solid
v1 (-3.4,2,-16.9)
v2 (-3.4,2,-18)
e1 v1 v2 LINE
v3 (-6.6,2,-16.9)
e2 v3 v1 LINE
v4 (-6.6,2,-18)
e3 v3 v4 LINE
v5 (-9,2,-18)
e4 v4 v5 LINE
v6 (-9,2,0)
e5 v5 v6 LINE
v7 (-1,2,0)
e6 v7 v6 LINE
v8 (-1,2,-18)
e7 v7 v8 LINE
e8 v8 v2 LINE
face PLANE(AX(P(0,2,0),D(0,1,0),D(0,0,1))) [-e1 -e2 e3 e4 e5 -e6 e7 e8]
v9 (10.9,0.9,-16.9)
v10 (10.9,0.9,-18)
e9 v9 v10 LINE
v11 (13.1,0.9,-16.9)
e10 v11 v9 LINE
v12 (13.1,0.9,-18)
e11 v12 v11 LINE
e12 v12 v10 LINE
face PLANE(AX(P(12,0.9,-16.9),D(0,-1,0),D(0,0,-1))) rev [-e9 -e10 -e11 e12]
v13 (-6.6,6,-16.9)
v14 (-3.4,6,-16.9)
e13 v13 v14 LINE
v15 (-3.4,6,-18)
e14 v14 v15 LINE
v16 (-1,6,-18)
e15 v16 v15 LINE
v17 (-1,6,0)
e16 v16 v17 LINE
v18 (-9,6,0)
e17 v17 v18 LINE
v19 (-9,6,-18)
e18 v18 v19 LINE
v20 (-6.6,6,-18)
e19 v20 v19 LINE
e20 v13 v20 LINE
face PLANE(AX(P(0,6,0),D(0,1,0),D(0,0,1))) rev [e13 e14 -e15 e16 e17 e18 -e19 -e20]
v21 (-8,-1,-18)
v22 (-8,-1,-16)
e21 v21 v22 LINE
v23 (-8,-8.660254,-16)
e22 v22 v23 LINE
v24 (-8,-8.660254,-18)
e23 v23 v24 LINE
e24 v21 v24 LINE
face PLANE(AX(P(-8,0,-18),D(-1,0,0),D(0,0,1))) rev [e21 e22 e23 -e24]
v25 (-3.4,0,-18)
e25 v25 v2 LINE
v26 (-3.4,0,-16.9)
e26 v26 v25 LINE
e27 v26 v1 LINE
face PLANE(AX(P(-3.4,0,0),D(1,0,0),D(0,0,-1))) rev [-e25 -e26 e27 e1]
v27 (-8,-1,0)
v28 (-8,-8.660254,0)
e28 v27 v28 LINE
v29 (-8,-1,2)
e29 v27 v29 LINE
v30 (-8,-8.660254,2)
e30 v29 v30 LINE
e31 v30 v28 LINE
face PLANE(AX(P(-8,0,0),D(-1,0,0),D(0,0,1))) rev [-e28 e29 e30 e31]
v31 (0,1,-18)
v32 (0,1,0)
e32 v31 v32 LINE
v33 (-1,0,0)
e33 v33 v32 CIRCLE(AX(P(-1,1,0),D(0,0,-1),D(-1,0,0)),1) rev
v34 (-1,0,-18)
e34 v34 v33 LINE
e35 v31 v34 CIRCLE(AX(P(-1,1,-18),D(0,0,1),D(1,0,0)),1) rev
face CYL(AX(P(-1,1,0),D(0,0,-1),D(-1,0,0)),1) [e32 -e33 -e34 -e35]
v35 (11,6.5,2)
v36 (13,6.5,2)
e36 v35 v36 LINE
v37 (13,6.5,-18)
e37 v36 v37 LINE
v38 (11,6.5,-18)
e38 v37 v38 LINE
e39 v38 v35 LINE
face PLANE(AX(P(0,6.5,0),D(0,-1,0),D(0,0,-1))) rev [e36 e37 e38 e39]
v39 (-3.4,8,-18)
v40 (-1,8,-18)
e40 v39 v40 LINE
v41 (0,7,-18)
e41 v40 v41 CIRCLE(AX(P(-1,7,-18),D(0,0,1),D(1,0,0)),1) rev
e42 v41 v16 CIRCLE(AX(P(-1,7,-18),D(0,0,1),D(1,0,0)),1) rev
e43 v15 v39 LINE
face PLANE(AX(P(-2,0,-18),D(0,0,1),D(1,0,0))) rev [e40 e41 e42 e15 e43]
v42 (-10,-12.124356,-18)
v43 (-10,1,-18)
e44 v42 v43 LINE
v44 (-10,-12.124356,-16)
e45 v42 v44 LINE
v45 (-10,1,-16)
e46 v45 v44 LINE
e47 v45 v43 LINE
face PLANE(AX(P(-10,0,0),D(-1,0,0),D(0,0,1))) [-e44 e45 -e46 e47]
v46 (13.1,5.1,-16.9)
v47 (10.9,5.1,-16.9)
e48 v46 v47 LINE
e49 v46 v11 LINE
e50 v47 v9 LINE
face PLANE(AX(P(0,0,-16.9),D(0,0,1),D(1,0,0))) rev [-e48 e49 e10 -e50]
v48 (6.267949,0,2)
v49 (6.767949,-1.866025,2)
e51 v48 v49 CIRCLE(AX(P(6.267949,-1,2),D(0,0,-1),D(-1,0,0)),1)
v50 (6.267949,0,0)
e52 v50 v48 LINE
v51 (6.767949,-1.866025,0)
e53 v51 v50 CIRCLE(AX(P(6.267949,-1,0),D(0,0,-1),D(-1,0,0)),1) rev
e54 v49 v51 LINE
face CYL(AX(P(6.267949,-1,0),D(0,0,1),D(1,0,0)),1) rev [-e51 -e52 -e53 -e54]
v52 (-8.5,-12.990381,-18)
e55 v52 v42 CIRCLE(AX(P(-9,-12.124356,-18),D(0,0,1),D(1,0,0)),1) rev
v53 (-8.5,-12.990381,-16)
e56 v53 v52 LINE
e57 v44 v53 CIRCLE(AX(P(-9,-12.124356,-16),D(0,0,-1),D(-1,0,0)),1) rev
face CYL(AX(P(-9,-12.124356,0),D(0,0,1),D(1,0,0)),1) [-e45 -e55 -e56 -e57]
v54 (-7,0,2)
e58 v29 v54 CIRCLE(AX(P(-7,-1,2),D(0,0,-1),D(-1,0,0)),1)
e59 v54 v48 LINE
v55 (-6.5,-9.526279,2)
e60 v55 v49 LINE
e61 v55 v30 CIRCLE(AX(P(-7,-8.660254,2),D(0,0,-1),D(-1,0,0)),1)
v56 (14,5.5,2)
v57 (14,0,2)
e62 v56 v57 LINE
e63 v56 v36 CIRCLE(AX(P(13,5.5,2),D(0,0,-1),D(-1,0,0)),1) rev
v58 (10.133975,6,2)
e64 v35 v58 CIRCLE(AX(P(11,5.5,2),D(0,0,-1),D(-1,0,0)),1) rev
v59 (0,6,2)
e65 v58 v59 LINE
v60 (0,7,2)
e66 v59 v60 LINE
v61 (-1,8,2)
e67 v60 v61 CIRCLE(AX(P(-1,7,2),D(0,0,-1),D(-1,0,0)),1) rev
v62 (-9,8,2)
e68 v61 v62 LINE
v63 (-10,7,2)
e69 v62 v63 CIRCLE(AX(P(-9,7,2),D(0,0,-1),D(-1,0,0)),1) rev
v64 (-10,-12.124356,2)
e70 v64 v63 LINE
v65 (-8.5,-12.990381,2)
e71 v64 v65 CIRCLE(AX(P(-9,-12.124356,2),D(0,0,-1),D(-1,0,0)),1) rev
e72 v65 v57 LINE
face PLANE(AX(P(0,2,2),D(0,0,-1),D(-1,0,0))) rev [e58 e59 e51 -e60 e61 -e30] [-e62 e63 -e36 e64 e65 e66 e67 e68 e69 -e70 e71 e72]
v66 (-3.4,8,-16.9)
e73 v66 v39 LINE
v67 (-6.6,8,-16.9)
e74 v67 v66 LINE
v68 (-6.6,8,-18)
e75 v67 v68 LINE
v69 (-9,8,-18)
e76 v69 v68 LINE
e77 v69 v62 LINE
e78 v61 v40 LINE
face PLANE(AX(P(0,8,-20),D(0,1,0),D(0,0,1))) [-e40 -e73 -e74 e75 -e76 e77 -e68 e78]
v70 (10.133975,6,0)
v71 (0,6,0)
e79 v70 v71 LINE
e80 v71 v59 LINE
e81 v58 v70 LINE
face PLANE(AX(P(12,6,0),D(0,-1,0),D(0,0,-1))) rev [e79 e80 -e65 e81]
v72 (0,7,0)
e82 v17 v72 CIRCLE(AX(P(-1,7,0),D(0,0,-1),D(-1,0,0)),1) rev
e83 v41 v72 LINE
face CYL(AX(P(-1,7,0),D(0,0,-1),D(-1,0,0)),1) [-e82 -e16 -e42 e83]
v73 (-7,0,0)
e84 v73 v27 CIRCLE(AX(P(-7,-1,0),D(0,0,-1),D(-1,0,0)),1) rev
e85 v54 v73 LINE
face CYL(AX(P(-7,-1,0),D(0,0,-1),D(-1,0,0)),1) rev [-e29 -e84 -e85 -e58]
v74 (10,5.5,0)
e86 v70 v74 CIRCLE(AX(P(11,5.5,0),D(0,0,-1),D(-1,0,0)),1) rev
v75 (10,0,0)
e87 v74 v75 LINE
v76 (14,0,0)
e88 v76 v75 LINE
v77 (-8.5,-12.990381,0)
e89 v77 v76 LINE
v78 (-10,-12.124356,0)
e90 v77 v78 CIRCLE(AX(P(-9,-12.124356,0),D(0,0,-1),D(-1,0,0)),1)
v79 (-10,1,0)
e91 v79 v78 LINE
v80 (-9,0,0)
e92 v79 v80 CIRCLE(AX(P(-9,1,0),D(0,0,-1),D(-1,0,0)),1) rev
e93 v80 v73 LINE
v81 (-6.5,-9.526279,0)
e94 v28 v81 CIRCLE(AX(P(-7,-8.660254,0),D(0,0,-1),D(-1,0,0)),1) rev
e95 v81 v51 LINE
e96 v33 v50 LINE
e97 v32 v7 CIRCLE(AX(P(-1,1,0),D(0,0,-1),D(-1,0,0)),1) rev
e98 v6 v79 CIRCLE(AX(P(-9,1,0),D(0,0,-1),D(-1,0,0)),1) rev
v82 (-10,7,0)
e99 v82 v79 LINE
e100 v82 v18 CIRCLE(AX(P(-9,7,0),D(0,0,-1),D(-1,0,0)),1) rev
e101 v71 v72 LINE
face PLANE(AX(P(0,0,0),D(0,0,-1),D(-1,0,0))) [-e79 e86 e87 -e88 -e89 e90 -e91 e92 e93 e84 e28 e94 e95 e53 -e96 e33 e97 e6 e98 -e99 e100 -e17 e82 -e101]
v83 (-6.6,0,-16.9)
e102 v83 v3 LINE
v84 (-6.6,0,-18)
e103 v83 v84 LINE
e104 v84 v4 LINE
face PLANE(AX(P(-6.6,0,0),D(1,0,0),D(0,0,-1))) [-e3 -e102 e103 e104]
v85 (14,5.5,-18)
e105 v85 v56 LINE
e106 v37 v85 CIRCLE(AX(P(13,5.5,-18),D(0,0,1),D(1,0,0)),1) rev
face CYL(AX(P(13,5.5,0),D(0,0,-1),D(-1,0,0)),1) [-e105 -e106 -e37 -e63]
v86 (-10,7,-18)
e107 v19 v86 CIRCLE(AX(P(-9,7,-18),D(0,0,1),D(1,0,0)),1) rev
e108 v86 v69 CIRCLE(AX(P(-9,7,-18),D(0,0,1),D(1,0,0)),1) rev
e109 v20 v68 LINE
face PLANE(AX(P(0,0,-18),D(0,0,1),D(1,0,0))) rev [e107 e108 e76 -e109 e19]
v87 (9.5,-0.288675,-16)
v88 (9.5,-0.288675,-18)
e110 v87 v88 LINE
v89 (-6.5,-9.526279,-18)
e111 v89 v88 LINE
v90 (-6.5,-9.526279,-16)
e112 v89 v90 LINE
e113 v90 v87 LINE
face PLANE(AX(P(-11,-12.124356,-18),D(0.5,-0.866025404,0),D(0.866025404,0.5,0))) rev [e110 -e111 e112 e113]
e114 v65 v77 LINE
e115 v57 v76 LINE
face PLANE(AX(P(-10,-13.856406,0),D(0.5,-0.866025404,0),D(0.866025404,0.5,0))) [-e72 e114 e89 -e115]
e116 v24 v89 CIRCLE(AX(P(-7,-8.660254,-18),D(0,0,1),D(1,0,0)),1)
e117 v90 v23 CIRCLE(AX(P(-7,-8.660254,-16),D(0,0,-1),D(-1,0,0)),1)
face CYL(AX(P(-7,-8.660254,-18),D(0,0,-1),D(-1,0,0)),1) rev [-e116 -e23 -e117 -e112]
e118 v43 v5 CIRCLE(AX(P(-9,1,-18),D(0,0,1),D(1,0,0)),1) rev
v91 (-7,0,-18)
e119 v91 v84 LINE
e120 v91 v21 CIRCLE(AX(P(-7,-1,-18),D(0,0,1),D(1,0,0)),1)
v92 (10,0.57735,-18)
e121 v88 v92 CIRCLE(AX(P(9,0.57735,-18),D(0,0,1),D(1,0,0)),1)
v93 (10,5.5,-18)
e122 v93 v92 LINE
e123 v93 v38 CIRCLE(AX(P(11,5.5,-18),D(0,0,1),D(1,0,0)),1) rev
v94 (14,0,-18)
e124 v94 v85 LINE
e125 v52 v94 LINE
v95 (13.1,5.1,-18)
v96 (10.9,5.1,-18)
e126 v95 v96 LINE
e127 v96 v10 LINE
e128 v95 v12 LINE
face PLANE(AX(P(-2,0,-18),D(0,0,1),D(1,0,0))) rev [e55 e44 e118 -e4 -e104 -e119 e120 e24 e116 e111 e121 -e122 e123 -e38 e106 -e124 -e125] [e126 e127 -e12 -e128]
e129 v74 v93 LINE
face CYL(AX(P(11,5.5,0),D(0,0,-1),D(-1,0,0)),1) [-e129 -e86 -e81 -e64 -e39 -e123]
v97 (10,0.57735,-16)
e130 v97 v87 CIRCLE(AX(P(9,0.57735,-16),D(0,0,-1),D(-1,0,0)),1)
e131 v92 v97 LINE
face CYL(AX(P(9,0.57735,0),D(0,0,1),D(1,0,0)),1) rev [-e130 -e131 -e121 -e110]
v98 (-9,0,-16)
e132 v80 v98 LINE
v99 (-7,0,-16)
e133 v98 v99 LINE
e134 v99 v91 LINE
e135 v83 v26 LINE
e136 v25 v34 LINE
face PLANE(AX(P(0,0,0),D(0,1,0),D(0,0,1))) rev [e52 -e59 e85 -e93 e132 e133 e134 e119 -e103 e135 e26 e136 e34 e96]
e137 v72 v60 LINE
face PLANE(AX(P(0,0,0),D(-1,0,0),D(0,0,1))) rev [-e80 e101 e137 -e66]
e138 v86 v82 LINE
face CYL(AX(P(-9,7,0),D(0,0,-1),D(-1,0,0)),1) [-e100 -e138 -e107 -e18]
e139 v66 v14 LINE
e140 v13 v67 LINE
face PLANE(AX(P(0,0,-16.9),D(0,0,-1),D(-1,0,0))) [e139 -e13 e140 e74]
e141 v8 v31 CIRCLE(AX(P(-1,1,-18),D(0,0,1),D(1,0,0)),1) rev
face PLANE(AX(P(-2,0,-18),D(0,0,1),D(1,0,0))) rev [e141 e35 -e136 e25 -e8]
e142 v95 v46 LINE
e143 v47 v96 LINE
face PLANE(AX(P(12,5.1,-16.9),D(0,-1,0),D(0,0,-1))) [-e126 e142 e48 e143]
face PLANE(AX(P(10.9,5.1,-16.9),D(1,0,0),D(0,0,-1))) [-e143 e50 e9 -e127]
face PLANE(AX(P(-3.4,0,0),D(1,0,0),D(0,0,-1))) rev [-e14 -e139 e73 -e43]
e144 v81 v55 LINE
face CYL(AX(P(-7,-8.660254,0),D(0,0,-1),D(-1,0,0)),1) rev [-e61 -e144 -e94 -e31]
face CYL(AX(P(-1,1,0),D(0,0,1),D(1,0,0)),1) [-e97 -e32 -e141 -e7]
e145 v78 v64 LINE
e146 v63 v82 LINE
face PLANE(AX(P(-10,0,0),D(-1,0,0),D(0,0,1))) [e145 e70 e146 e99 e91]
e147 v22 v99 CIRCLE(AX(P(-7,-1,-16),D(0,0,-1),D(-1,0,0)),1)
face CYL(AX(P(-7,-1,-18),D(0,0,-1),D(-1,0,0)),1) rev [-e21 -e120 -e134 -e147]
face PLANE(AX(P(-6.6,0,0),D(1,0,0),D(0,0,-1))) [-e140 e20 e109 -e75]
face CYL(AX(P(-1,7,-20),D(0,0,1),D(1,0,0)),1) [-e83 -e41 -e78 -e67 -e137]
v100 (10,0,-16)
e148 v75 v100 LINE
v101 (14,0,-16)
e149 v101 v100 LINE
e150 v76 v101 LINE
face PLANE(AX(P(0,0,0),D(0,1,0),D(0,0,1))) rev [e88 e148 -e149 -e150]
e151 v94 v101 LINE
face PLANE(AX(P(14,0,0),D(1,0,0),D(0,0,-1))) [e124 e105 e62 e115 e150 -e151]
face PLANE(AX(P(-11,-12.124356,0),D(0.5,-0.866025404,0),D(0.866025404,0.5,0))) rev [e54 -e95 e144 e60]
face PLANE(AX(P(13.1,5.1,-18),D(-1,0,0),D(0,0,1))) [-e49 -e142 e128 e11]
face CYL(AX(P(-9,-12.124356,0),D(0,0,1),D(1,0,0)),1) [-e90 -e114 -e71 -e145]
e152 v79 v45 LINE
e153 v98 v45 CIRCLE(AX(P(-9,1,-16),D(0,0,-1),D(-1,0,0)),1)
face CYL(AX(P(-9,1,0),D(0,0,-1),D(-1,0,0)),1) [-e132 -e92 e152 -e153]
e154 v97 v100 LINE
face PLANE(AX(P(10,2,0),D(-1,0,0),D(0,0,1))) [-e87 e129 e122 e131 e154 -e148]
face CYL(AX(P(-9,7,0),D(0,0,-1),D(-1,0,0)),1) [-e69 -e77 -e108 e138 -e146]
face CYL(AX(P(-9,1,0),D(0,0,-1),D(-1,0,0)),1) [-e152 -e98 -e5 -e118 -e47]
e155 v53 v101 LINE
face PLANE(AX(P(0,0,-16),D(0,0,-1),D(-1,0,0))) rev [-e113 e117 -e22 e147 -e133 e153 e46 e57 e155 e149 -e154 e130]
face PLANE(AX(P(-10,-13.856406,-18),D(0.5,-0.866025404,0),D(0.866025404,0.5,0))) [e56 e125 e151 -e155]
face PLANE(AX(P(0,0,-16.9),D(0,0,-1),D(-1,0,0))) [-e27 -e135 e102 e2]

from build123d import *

# Parameters (mm, degrees)
SKETCH1_W           = 14
SKETCH1_H           = 22
SKETCH1_W_2         = 10
SKETCH1_H_2         = 18
EXTRUDE_THIN1_DEPTH = 2
SKETCH2_W           = 2
SKETCH2_H           = 22
BOSS_EXTRUDE1_DEPTH = 4.5
SKETCH3_W           = 22
SKETCH3_H           = 8
SKETCH3_W_2         = 18
SKETCH3_H_2         = 4
EXTRUDE_THIN2_DEPTH = 2
SKETCH4_W           = 2
SKETCH4_H           = 10.076871622
CUT_EXTRUDE1_DEPTH  = 26.690465157
SKETCH5_W           = 1.1
SKETCH5_H           = 4.2
SKETCH5_H_2         = 2
CUT_EXTRUDE2_DEPTH  = 1.1
BOSS_EXTRUDE2_DEPTH = 8
SKETCH7_W           = 2.5
SKETCH7_H           = 1.1
SKETCH7_W_2         = 0.9
BOSS_EXTRUDE3_DEPTH = 8
CUT_EXTRUDE3_DEPTH  = 1.1
BOSS_EXTRUDE4_REACH = 25.065
SKETCH9_W           = 2
SKETCH9_H           = 4
BOSS_EXTRUDE5_DEPTH = 2
SKETCH11_W          = 0.9
SKETCH11_H          = 4.2
BOSS_EXTRUDE6_DEPTH = 1.1
EXTRUDE_THIN4_DEPTH = 2
LPATTERN1_COUNT     = 2
LPATTERN1_PITCH     = 18
SKETCH14_W          = 2.2
SKETCH14_H          = 4.2
CUT_EXTRUDE4_DEPTH  = 2
FILLET1_R           = 1


with BuildPart() as part:
    # Sketch1 → Extrude-Thin1 (new body)
    with BuildSketch(Plane(origin=(0, 0, 0), x_dir=(1, 0, 0), z_dir=(0, 1, 0))):
        with Locations((5, 9)):
            Rectangle(SKETCH1_W, SKETCH1_H)
        with Locations((5, 9)):
            Rectangle(SKETCH1_W_2, SKETCH1_H_2, mode=Mode.SUBTRACT)
    extrude(amount=EXTRUDE_THIN1_DEPTH)

    # Sketch2 → Boss-Extrude1 (add)
    with BuildSketch(Plane(origin=(0, 2, 0), x_dir=(1, 0, 0), z_dir=(0, 1, 0))):
        with Locations((11, 9)):
            Rectangle(SKETCH2_W, SKETCH2_H)
    extrude(amount=BOSS_EXTRUDE1_DEPTH)

    # Sketch3 → Extrude-Thin2 (add)
    with BuildSketch(Plane.ZY.offset(2)):
        with Locations((-9, 4)):
            Rectangle(SKETCH3_W, SKETCH3_H)
        with Locations((-9, 4)):
            Rectangle(SKETCH3_W_2, SKETCH3_H_2, mode=Mode.SUBTRACT)
    extrude(amount=-EXTRUDE_THIN2_DEPTH)

    # Sketch4 → Cut-Extrude1 (cut, through all)
    with BuildSketch(Plane(origin=(12, 0, 0), x_dir=(0, 0, -1), z_dir=(1, 0, 0))):
        with Locations((19, 5.038435811)):
            Rectangle(SKETCH4_W, SKETCH4_H)
    extrude(amount=-CUT_EXTRUDE1_DEPTH, mode=Mode.SUBTRACT)

    # Sketch5 → Cut-Extrude2 (cut)
    with BuildSketch(Plane(origin=(0, 0, -18), x_dir=(-1, 0, 0), z_dir=(0, 0, -1))):
        with Locations((-11.45, 3)):
            Rectangle(SKETCH5_W, SKETCH5_H)
        with Locations((1.45, 7)):
            Rectangle(SKETCH5_W, SKETCH5_H_2)
        with Locations((1.45, 1)):
            Rectangle(SKETCH5_W, SKETCH5_H_2)
    extrude(amount=-CUT_EXTRUDE2_DEPTH, mode=Mode.SUBTRACT)

    # Sketch6 → Boss-Extrude2 (add)
    with BuildSketch(Plane.ZY.offset(2)):
        Polygon((-16.9, 2), (-16.9, 0), (2, 0), (2, 8), (-16.9, 8), (-16.9, 6), (0, 6), (0, 2), align=None)
    extrude(amount=BOSS_EXTRUDE2_DEPTH)

    # Sketch7 → Boss-Extrude3 (add, through all)
    with BuildSketch(Plane(origin=(0, 8, 0), x_dir=(1, 0, 0), z_dir=(0, 1, 0))):
        with Locations((-2.15, 17.45)):
            Rectangle(SKETCH7_W, SKETCH7_H)
        with Locations((-7.85, 17.45)):
            Rectangle(SKETCH7_W, SKETCH7_H)
        with Locations((-9.55, 17.45)):
            Rectangle(SKETCH7_W_2, SKETCH7_H)
    extrude(amount=-BOSS_EXTRUDE3_DEPTH)

    # Sketch8 → Cut-Extrude3 (cut)
    with BuildSketch(Plane(origin=(0, 0, -18), x_dir=(-1, 0, 0), z_dir=(0, 0, -1))):
        Polygon((6.6, 6), (0.9, 6), (0.9, 2), (6.6, 4.505494505), align=None)
        Polygon((6.6, 4.505494505), (0.9, 2), (6.6, 2), align=None)
        Polygon((10, 2), (10, 6), (6.6, 4.505494505), (6.6, 2), align=None)
        Polygon((10, 6), (6.6, 6), (6.6, 4.505494505), align=None)
    extrude(amount=-CUT_EXTRUDE3_DEPTH, mode=Mode.SUBTRACT)

    # Sketch9 → Boss-Extrude4 (add, up to next)
    with BuildSketch(Plane(origin=(0, 0, 0), x_dir=(0, 0, -1), z_dir=(1, 0, 0)), mode=Mode.PRIVATE) as boss_extrude4_sk1:
        with Locations((-1, 4)):
            Rectangle(SKETCH9_W, SKETCH9_H)
    boss_extrude4_tool1 = extrude(boss_extrude4_sk1.sketch, amount=BOSS_EXTRUDE4_REACH, mode=Mode.PRIVATE) - part.part
    add(boss_extrude4_tool1.solids().sort_by_distance((0, 4, 1))[0])

    # Sketch10 → Boss-Extrude5 (add)
    with BuildSketch(Plane(origin=(12, 0, 0), x_dir=(0, 0, -1), z_dir=(1, 0, 0))):
        Polygon((-2, 6.5), (-2, 0), (18, 0), (18, 0.9), (16.9, 0.9), (16.9, 5.1), (18, 5.1), (18, 6.5), align=None)
    extrude(amount=BOSS_EXTRUDE5_DEPTH)

    # Sketch11 → Boss-Extrude6 (add)
    with BuildSketch(Plane(origin=(0, 0, -16.9), x_dir=(-1, 0, 0), z_dir=(0, 0, -1))):
        with Locations((-13.55, 3)):
            Rectangle(SKETCH11_W, SKETCH11_H)
    extrude(amount=BOSS_EXTRUDE6_DEPTH)

    # Sketch13 → Extrude-Thin4 (add)
    with BuildSketch(Plane.XY.offset(2)):
        Polygon((-10, 0), (-10, -13.856406461), (14, 0), (13, 1.732050808), (-8, -10.392304845), (-8, 0), align=None)
    extrude_thin4 = extrude(amount=-EXTRUDE_THIN4_DEPTH)

    # LPattern1: Extrude-Thin4 ×2
    with Locations(*[(0, 0, -i * LPATTERN1_PITCH) for i in range(1, LPATTERN1_COUNT)]):
        add(extrude_thin4)

    # Sketch14 → Cut-Extrude4 (cut)
    with BuildSketch(Plane(origin=(0, 0, -16.9), x_dir=(-1, 0, 0), z_dir=(0, 0, -1))):
        with Locations((-12, 3)):
            Rectangle(SKETCH14_W, SKETCH14_H)
    extrude(amount=CUT_EXTRUDE4_DEPTH, mode=Mode.SUBTRACT)

    # Fillet1
    # the kernel refuses this fillet: 1 mm, written as the material it adds along each edge
    with BuildSketch(Plane(origin=(10, 0, 0), x_dir=(-0.866025403784438, -0.500000000000001, 0), z_dir=(0, 0, 1))) as fillet1_piece_1:
        with BuildLine():
            CenterArc((FILLET1_R * 3.73205080757, -FILLET1_R), FILLET1_R, 90, 150)
            Line((FILLET1_R * 3.23205080757, -FILLET1_R * 1.86602540378), (0, 0))
            Line((0, 0), (FILLET1_R * 3.73205080757, 0))
        make_face()
    extrude(amount=2)
    with BuildSketch(Plane(origin=(-8, -10.392304845, 2), x_dir=(0.8660254037844376, 0.5000000000000017, 0), z_dir=(0, 0, -1))) as fillet1_piece_2:
        with BuildLine():
            CenterArc((FILLET1_R * 1.73205080757, -FILLET1_R), FILLET1_R, 90, 120)
            Line((FILLET1_R * 0.866025403784, -FILLET1_R * 1.5), (0, 0))
            Line((0, 0), (FILLET1_R * 1.73205080757, 0))
        make_face()
    extrude(amount=2)
    with BuildSketch(Plane(origin=(-8, 0, 2), x_dir=(0, -1, 0), z_dir=(0, 0, -1)), Plane(origin=(-8, 0, -16), x_dir=(0, -1, 0), z_dir=(0, 0, -1))) as fillet1_piece_3:
        with BuildLine():
            CenterArc((FILLET1_R, -FILLET1_R), FILLET1_R, 90, 90)
            Line((0, -FILLET1_R), (0, 0))
            Line((0, 0), (FILLET1_R, 0))
        make_face()
    extrude(amount=2)
    with BuildSketch(Plane(origin=(10, 0, -16), x_dir=(0, 1, 0), z_dir=(0, 0, -1))) as fillet1_piece_4:
        with BuildLine():
            CenterArc((FILLET1_R * 0.57735026919, -FILLET1_R), FILLET1_R, 90, 60)
            Line((-FILLET1_R * 0.288675134595, -FILLET1_R * 0.5), (0, 0))
            Line((0, 0), (FILLET1_R * 0.57735026919, 0))
        make_face()
    extrude(amount=2)
    with BuildSketch(Plane(origin=(-8, -10.392304845, -16), x_dir=(0, 1, 0), z_dir=(0, 0, -1))) as fillet1_piece_5:
        with BuildLine():
            CenterArc((FILLET1_R * 1.73205080757, FILLET1_R), FILLET1_R, 150, 120)
            Line((FILLET1_R * 0.866025403784, FILLET1_R * 1.5), (0, 0))
            Line((0, 0), (FILLET1_R * 1.73205080757, 0))
        make_face()
    extrude(amount=2)
    # the kernel refuses this fillet: 1 mm, written as the material it takes off along each edge
    with BuildSketch(Plane(origin=(0, 0, -20.5), x_dir=(-1, 0, 0), z_dir=(0, 0, 1)), Plane(origin=(-10, 2, 0), x_dir=(0, -1, 0), z_dir=(0, 0, -1))) as fillet1_2_piece_1:
        with BuildLine():
            CenterArc((FILLET1_R, -FILLET1_R), FILLET1_R, 90, 90)
            Line((0, -FILLET1_R), (0, 0))
            Line((0, 0), (FILLET1_R, 0))
        make_face()
    extrude(amount=20.5, mode=Mode.SUBTRACT)
    with BuildSketch(Plane(origin=(0, 2, -20.5), x_dir=(-1, 0, 0), z_dir=(0, 0, 1)), Plane(origin=(-10, 6, -20.5), x_dir=(1, 0, 0), z_dir=(0, 0, 1)), Plane(origin=(0, 6, 0), x_dir=(-1, 0, 0), z_dir=(0, 0, -1))) as fillet1_2_piece_2:
        with BuildLine():
            CenterArc((FILLET1_R, FILLET1_R), FILLET1_R, 180, 90)
            Line((0, FILLET1_R), (0, 0))
            Line((0, 0), (FILLET1_R, 0))
        make_face()
    extrude(amount=20.5, mode=Mode.SUBTRACT)
    with BuildSketch(Plane(origin=(-10, 8, 4.5), x_dir=(1, 0, 0), z_dir=(0, 0, -1)), Plane(origin=(14, 6.5, -20.5), x_dir=(-1, 0, 0), z_dir=(0, 0, 1))) as fillet1_2_piece_3:
        with BuildLine():
            CenterArc((FILLET1_R, FILLET1_R), FILLET1_R, 180, 90)
            Line((0, FILLET1_R), (0, 0))
            Line((0, 0), (FILLET1_R, 0))
        make_face()
    extrude(amount=25, mode=Mode.SUBTRACT)
    with BuildSketch(Plane(origin=(-10, -13.856406461, 6.330127019), x_dir=(0.866025403784438, 0.5000000000000009, 0), z_dir=(0, 0, -1))) as fillet1_2_piece_4:
        with BuildLine():
            CenterArc((FILLET1_R * 1.73205080757, -FILLET1_R), FILLET1_R, 90, 120)
            Line((FILLET1_R * 0.866025403784, -FILLET1_R * 1.5), (0, 0))
            Line((0, 0), (FILLET1_R * 1.73205080757, 0))
        make_face()
    extrude(amount=10.660254038, mode=Mode.SUBTRACT)
    with BuildSketch(Plane(origin=(0, 8, 4.5), x_dir=(-1, 0, 0), z_dir=(0, 0, -1))) as fillet1_2_piece_5:
        with BuildLine():
            CenterArc((FILLET1_R, -FILLET1_R), FILLET1_R, 90, 90)
            Line((0, -FILLET1_R), (0, 0))
            Line((0, 0), (FILLET1_R, 0))
        make_face()
    extrude(amount=25, mode=Mode.SUBTRACT)
    with BuildSketch(Plane(origin=(10, 6.5, -20.5), x_dir=(1, 0, 0), z_dir=(0, 0, 1))) as fillet1_2_piece_6_section:
        with BuildLine():
            CenterArc((FILLET1_R, -FILLET1_R), FILLET1_R, 90, 90)
            Line((0, -FILLET1_R), (0, 0))
            Line((0, 0), (FILLET1_R, 0))
        make_face()
    fillet1_2_piece_6 = extrude(amount=25, mode=Mode.PRIVATE)
    fillet1_2_piece_6 = split(fillet1_2_piece_6, bisect_by=Plane(origin=(10.244024849, 6, -9), z_dir=(0, 1, 0)), keep=Keep.TOP, mode=Mode.PRIVATE)
    add(fillet1_2_piece_6, mode=Mode.SUBTRACT)
    with BuildSketch(Plane(origin=(10, 6.5, -20.5), x_dir=(1, 0, 0), z_dir=(0, 0, 1))) as fillet1_2_piece_7_section:
        with BuildLine():
            CenterArc((FILLET1_R, -FILLET1_R), FILLET1_R, 90, 90)
            Line((0, -FILLET1_R), (0, 0))
            Line((0, 0), (FILLET1_R, 0))
        make_face()
    fillet1_2_piece_7 = extrude(amount=25, mode=Mode.PRIVATE)
    fillet1_2_piece_7 = split(fillet1_2_piece_7, bisect_by=Plane(origin=(10.039684593, 5.876736387, 0), z_dir=(0, 0, -1)), keep=Keep.TOP, mode=Mode.PRIVATE)
    add(fillet1_2_piece_7, mode=Mode.SUBTRACT)
    with BuildSketch(Plane(origin=(-10, 0, 0), x_dir=(1, 0, 0), z_dir=(0, 0, -1))) as fillet1_2_piece_8:
        with BuildLine():
            CenterArc((FILLET1_R, -FILLET1_R), FILLET1_R, 90, 90)
            Line((0, -FILLET1_R), (0, 0))
            Line((0, 0), (FILLET1_R, 0))
        make_face()
    extrude(amount=16, mode=Mode.SUBTRACT)
    with BuildSketch(Plane(origin=(-10, -13.856406461, -11.669872981), x_dir=(0, 1, 0), z_dir=(0, 0, -1))) as fillet1_2_piece_9:
        with BuildLine():
            CenterArc((FILLET1_R * 1.73205080757, FILLET1_R), FILLET1_R, 150, 120)
            Line((FILLET1_R * 0.866025403784, FILLET1_R * 1.5), (0, 0))
            Line((0, 0), (FILLET1_R * 1.73205080757, 0))
        make_face()
    extrude(amount=10.660254038, mode=Mode.SUBTRACT)


solid = part.part
